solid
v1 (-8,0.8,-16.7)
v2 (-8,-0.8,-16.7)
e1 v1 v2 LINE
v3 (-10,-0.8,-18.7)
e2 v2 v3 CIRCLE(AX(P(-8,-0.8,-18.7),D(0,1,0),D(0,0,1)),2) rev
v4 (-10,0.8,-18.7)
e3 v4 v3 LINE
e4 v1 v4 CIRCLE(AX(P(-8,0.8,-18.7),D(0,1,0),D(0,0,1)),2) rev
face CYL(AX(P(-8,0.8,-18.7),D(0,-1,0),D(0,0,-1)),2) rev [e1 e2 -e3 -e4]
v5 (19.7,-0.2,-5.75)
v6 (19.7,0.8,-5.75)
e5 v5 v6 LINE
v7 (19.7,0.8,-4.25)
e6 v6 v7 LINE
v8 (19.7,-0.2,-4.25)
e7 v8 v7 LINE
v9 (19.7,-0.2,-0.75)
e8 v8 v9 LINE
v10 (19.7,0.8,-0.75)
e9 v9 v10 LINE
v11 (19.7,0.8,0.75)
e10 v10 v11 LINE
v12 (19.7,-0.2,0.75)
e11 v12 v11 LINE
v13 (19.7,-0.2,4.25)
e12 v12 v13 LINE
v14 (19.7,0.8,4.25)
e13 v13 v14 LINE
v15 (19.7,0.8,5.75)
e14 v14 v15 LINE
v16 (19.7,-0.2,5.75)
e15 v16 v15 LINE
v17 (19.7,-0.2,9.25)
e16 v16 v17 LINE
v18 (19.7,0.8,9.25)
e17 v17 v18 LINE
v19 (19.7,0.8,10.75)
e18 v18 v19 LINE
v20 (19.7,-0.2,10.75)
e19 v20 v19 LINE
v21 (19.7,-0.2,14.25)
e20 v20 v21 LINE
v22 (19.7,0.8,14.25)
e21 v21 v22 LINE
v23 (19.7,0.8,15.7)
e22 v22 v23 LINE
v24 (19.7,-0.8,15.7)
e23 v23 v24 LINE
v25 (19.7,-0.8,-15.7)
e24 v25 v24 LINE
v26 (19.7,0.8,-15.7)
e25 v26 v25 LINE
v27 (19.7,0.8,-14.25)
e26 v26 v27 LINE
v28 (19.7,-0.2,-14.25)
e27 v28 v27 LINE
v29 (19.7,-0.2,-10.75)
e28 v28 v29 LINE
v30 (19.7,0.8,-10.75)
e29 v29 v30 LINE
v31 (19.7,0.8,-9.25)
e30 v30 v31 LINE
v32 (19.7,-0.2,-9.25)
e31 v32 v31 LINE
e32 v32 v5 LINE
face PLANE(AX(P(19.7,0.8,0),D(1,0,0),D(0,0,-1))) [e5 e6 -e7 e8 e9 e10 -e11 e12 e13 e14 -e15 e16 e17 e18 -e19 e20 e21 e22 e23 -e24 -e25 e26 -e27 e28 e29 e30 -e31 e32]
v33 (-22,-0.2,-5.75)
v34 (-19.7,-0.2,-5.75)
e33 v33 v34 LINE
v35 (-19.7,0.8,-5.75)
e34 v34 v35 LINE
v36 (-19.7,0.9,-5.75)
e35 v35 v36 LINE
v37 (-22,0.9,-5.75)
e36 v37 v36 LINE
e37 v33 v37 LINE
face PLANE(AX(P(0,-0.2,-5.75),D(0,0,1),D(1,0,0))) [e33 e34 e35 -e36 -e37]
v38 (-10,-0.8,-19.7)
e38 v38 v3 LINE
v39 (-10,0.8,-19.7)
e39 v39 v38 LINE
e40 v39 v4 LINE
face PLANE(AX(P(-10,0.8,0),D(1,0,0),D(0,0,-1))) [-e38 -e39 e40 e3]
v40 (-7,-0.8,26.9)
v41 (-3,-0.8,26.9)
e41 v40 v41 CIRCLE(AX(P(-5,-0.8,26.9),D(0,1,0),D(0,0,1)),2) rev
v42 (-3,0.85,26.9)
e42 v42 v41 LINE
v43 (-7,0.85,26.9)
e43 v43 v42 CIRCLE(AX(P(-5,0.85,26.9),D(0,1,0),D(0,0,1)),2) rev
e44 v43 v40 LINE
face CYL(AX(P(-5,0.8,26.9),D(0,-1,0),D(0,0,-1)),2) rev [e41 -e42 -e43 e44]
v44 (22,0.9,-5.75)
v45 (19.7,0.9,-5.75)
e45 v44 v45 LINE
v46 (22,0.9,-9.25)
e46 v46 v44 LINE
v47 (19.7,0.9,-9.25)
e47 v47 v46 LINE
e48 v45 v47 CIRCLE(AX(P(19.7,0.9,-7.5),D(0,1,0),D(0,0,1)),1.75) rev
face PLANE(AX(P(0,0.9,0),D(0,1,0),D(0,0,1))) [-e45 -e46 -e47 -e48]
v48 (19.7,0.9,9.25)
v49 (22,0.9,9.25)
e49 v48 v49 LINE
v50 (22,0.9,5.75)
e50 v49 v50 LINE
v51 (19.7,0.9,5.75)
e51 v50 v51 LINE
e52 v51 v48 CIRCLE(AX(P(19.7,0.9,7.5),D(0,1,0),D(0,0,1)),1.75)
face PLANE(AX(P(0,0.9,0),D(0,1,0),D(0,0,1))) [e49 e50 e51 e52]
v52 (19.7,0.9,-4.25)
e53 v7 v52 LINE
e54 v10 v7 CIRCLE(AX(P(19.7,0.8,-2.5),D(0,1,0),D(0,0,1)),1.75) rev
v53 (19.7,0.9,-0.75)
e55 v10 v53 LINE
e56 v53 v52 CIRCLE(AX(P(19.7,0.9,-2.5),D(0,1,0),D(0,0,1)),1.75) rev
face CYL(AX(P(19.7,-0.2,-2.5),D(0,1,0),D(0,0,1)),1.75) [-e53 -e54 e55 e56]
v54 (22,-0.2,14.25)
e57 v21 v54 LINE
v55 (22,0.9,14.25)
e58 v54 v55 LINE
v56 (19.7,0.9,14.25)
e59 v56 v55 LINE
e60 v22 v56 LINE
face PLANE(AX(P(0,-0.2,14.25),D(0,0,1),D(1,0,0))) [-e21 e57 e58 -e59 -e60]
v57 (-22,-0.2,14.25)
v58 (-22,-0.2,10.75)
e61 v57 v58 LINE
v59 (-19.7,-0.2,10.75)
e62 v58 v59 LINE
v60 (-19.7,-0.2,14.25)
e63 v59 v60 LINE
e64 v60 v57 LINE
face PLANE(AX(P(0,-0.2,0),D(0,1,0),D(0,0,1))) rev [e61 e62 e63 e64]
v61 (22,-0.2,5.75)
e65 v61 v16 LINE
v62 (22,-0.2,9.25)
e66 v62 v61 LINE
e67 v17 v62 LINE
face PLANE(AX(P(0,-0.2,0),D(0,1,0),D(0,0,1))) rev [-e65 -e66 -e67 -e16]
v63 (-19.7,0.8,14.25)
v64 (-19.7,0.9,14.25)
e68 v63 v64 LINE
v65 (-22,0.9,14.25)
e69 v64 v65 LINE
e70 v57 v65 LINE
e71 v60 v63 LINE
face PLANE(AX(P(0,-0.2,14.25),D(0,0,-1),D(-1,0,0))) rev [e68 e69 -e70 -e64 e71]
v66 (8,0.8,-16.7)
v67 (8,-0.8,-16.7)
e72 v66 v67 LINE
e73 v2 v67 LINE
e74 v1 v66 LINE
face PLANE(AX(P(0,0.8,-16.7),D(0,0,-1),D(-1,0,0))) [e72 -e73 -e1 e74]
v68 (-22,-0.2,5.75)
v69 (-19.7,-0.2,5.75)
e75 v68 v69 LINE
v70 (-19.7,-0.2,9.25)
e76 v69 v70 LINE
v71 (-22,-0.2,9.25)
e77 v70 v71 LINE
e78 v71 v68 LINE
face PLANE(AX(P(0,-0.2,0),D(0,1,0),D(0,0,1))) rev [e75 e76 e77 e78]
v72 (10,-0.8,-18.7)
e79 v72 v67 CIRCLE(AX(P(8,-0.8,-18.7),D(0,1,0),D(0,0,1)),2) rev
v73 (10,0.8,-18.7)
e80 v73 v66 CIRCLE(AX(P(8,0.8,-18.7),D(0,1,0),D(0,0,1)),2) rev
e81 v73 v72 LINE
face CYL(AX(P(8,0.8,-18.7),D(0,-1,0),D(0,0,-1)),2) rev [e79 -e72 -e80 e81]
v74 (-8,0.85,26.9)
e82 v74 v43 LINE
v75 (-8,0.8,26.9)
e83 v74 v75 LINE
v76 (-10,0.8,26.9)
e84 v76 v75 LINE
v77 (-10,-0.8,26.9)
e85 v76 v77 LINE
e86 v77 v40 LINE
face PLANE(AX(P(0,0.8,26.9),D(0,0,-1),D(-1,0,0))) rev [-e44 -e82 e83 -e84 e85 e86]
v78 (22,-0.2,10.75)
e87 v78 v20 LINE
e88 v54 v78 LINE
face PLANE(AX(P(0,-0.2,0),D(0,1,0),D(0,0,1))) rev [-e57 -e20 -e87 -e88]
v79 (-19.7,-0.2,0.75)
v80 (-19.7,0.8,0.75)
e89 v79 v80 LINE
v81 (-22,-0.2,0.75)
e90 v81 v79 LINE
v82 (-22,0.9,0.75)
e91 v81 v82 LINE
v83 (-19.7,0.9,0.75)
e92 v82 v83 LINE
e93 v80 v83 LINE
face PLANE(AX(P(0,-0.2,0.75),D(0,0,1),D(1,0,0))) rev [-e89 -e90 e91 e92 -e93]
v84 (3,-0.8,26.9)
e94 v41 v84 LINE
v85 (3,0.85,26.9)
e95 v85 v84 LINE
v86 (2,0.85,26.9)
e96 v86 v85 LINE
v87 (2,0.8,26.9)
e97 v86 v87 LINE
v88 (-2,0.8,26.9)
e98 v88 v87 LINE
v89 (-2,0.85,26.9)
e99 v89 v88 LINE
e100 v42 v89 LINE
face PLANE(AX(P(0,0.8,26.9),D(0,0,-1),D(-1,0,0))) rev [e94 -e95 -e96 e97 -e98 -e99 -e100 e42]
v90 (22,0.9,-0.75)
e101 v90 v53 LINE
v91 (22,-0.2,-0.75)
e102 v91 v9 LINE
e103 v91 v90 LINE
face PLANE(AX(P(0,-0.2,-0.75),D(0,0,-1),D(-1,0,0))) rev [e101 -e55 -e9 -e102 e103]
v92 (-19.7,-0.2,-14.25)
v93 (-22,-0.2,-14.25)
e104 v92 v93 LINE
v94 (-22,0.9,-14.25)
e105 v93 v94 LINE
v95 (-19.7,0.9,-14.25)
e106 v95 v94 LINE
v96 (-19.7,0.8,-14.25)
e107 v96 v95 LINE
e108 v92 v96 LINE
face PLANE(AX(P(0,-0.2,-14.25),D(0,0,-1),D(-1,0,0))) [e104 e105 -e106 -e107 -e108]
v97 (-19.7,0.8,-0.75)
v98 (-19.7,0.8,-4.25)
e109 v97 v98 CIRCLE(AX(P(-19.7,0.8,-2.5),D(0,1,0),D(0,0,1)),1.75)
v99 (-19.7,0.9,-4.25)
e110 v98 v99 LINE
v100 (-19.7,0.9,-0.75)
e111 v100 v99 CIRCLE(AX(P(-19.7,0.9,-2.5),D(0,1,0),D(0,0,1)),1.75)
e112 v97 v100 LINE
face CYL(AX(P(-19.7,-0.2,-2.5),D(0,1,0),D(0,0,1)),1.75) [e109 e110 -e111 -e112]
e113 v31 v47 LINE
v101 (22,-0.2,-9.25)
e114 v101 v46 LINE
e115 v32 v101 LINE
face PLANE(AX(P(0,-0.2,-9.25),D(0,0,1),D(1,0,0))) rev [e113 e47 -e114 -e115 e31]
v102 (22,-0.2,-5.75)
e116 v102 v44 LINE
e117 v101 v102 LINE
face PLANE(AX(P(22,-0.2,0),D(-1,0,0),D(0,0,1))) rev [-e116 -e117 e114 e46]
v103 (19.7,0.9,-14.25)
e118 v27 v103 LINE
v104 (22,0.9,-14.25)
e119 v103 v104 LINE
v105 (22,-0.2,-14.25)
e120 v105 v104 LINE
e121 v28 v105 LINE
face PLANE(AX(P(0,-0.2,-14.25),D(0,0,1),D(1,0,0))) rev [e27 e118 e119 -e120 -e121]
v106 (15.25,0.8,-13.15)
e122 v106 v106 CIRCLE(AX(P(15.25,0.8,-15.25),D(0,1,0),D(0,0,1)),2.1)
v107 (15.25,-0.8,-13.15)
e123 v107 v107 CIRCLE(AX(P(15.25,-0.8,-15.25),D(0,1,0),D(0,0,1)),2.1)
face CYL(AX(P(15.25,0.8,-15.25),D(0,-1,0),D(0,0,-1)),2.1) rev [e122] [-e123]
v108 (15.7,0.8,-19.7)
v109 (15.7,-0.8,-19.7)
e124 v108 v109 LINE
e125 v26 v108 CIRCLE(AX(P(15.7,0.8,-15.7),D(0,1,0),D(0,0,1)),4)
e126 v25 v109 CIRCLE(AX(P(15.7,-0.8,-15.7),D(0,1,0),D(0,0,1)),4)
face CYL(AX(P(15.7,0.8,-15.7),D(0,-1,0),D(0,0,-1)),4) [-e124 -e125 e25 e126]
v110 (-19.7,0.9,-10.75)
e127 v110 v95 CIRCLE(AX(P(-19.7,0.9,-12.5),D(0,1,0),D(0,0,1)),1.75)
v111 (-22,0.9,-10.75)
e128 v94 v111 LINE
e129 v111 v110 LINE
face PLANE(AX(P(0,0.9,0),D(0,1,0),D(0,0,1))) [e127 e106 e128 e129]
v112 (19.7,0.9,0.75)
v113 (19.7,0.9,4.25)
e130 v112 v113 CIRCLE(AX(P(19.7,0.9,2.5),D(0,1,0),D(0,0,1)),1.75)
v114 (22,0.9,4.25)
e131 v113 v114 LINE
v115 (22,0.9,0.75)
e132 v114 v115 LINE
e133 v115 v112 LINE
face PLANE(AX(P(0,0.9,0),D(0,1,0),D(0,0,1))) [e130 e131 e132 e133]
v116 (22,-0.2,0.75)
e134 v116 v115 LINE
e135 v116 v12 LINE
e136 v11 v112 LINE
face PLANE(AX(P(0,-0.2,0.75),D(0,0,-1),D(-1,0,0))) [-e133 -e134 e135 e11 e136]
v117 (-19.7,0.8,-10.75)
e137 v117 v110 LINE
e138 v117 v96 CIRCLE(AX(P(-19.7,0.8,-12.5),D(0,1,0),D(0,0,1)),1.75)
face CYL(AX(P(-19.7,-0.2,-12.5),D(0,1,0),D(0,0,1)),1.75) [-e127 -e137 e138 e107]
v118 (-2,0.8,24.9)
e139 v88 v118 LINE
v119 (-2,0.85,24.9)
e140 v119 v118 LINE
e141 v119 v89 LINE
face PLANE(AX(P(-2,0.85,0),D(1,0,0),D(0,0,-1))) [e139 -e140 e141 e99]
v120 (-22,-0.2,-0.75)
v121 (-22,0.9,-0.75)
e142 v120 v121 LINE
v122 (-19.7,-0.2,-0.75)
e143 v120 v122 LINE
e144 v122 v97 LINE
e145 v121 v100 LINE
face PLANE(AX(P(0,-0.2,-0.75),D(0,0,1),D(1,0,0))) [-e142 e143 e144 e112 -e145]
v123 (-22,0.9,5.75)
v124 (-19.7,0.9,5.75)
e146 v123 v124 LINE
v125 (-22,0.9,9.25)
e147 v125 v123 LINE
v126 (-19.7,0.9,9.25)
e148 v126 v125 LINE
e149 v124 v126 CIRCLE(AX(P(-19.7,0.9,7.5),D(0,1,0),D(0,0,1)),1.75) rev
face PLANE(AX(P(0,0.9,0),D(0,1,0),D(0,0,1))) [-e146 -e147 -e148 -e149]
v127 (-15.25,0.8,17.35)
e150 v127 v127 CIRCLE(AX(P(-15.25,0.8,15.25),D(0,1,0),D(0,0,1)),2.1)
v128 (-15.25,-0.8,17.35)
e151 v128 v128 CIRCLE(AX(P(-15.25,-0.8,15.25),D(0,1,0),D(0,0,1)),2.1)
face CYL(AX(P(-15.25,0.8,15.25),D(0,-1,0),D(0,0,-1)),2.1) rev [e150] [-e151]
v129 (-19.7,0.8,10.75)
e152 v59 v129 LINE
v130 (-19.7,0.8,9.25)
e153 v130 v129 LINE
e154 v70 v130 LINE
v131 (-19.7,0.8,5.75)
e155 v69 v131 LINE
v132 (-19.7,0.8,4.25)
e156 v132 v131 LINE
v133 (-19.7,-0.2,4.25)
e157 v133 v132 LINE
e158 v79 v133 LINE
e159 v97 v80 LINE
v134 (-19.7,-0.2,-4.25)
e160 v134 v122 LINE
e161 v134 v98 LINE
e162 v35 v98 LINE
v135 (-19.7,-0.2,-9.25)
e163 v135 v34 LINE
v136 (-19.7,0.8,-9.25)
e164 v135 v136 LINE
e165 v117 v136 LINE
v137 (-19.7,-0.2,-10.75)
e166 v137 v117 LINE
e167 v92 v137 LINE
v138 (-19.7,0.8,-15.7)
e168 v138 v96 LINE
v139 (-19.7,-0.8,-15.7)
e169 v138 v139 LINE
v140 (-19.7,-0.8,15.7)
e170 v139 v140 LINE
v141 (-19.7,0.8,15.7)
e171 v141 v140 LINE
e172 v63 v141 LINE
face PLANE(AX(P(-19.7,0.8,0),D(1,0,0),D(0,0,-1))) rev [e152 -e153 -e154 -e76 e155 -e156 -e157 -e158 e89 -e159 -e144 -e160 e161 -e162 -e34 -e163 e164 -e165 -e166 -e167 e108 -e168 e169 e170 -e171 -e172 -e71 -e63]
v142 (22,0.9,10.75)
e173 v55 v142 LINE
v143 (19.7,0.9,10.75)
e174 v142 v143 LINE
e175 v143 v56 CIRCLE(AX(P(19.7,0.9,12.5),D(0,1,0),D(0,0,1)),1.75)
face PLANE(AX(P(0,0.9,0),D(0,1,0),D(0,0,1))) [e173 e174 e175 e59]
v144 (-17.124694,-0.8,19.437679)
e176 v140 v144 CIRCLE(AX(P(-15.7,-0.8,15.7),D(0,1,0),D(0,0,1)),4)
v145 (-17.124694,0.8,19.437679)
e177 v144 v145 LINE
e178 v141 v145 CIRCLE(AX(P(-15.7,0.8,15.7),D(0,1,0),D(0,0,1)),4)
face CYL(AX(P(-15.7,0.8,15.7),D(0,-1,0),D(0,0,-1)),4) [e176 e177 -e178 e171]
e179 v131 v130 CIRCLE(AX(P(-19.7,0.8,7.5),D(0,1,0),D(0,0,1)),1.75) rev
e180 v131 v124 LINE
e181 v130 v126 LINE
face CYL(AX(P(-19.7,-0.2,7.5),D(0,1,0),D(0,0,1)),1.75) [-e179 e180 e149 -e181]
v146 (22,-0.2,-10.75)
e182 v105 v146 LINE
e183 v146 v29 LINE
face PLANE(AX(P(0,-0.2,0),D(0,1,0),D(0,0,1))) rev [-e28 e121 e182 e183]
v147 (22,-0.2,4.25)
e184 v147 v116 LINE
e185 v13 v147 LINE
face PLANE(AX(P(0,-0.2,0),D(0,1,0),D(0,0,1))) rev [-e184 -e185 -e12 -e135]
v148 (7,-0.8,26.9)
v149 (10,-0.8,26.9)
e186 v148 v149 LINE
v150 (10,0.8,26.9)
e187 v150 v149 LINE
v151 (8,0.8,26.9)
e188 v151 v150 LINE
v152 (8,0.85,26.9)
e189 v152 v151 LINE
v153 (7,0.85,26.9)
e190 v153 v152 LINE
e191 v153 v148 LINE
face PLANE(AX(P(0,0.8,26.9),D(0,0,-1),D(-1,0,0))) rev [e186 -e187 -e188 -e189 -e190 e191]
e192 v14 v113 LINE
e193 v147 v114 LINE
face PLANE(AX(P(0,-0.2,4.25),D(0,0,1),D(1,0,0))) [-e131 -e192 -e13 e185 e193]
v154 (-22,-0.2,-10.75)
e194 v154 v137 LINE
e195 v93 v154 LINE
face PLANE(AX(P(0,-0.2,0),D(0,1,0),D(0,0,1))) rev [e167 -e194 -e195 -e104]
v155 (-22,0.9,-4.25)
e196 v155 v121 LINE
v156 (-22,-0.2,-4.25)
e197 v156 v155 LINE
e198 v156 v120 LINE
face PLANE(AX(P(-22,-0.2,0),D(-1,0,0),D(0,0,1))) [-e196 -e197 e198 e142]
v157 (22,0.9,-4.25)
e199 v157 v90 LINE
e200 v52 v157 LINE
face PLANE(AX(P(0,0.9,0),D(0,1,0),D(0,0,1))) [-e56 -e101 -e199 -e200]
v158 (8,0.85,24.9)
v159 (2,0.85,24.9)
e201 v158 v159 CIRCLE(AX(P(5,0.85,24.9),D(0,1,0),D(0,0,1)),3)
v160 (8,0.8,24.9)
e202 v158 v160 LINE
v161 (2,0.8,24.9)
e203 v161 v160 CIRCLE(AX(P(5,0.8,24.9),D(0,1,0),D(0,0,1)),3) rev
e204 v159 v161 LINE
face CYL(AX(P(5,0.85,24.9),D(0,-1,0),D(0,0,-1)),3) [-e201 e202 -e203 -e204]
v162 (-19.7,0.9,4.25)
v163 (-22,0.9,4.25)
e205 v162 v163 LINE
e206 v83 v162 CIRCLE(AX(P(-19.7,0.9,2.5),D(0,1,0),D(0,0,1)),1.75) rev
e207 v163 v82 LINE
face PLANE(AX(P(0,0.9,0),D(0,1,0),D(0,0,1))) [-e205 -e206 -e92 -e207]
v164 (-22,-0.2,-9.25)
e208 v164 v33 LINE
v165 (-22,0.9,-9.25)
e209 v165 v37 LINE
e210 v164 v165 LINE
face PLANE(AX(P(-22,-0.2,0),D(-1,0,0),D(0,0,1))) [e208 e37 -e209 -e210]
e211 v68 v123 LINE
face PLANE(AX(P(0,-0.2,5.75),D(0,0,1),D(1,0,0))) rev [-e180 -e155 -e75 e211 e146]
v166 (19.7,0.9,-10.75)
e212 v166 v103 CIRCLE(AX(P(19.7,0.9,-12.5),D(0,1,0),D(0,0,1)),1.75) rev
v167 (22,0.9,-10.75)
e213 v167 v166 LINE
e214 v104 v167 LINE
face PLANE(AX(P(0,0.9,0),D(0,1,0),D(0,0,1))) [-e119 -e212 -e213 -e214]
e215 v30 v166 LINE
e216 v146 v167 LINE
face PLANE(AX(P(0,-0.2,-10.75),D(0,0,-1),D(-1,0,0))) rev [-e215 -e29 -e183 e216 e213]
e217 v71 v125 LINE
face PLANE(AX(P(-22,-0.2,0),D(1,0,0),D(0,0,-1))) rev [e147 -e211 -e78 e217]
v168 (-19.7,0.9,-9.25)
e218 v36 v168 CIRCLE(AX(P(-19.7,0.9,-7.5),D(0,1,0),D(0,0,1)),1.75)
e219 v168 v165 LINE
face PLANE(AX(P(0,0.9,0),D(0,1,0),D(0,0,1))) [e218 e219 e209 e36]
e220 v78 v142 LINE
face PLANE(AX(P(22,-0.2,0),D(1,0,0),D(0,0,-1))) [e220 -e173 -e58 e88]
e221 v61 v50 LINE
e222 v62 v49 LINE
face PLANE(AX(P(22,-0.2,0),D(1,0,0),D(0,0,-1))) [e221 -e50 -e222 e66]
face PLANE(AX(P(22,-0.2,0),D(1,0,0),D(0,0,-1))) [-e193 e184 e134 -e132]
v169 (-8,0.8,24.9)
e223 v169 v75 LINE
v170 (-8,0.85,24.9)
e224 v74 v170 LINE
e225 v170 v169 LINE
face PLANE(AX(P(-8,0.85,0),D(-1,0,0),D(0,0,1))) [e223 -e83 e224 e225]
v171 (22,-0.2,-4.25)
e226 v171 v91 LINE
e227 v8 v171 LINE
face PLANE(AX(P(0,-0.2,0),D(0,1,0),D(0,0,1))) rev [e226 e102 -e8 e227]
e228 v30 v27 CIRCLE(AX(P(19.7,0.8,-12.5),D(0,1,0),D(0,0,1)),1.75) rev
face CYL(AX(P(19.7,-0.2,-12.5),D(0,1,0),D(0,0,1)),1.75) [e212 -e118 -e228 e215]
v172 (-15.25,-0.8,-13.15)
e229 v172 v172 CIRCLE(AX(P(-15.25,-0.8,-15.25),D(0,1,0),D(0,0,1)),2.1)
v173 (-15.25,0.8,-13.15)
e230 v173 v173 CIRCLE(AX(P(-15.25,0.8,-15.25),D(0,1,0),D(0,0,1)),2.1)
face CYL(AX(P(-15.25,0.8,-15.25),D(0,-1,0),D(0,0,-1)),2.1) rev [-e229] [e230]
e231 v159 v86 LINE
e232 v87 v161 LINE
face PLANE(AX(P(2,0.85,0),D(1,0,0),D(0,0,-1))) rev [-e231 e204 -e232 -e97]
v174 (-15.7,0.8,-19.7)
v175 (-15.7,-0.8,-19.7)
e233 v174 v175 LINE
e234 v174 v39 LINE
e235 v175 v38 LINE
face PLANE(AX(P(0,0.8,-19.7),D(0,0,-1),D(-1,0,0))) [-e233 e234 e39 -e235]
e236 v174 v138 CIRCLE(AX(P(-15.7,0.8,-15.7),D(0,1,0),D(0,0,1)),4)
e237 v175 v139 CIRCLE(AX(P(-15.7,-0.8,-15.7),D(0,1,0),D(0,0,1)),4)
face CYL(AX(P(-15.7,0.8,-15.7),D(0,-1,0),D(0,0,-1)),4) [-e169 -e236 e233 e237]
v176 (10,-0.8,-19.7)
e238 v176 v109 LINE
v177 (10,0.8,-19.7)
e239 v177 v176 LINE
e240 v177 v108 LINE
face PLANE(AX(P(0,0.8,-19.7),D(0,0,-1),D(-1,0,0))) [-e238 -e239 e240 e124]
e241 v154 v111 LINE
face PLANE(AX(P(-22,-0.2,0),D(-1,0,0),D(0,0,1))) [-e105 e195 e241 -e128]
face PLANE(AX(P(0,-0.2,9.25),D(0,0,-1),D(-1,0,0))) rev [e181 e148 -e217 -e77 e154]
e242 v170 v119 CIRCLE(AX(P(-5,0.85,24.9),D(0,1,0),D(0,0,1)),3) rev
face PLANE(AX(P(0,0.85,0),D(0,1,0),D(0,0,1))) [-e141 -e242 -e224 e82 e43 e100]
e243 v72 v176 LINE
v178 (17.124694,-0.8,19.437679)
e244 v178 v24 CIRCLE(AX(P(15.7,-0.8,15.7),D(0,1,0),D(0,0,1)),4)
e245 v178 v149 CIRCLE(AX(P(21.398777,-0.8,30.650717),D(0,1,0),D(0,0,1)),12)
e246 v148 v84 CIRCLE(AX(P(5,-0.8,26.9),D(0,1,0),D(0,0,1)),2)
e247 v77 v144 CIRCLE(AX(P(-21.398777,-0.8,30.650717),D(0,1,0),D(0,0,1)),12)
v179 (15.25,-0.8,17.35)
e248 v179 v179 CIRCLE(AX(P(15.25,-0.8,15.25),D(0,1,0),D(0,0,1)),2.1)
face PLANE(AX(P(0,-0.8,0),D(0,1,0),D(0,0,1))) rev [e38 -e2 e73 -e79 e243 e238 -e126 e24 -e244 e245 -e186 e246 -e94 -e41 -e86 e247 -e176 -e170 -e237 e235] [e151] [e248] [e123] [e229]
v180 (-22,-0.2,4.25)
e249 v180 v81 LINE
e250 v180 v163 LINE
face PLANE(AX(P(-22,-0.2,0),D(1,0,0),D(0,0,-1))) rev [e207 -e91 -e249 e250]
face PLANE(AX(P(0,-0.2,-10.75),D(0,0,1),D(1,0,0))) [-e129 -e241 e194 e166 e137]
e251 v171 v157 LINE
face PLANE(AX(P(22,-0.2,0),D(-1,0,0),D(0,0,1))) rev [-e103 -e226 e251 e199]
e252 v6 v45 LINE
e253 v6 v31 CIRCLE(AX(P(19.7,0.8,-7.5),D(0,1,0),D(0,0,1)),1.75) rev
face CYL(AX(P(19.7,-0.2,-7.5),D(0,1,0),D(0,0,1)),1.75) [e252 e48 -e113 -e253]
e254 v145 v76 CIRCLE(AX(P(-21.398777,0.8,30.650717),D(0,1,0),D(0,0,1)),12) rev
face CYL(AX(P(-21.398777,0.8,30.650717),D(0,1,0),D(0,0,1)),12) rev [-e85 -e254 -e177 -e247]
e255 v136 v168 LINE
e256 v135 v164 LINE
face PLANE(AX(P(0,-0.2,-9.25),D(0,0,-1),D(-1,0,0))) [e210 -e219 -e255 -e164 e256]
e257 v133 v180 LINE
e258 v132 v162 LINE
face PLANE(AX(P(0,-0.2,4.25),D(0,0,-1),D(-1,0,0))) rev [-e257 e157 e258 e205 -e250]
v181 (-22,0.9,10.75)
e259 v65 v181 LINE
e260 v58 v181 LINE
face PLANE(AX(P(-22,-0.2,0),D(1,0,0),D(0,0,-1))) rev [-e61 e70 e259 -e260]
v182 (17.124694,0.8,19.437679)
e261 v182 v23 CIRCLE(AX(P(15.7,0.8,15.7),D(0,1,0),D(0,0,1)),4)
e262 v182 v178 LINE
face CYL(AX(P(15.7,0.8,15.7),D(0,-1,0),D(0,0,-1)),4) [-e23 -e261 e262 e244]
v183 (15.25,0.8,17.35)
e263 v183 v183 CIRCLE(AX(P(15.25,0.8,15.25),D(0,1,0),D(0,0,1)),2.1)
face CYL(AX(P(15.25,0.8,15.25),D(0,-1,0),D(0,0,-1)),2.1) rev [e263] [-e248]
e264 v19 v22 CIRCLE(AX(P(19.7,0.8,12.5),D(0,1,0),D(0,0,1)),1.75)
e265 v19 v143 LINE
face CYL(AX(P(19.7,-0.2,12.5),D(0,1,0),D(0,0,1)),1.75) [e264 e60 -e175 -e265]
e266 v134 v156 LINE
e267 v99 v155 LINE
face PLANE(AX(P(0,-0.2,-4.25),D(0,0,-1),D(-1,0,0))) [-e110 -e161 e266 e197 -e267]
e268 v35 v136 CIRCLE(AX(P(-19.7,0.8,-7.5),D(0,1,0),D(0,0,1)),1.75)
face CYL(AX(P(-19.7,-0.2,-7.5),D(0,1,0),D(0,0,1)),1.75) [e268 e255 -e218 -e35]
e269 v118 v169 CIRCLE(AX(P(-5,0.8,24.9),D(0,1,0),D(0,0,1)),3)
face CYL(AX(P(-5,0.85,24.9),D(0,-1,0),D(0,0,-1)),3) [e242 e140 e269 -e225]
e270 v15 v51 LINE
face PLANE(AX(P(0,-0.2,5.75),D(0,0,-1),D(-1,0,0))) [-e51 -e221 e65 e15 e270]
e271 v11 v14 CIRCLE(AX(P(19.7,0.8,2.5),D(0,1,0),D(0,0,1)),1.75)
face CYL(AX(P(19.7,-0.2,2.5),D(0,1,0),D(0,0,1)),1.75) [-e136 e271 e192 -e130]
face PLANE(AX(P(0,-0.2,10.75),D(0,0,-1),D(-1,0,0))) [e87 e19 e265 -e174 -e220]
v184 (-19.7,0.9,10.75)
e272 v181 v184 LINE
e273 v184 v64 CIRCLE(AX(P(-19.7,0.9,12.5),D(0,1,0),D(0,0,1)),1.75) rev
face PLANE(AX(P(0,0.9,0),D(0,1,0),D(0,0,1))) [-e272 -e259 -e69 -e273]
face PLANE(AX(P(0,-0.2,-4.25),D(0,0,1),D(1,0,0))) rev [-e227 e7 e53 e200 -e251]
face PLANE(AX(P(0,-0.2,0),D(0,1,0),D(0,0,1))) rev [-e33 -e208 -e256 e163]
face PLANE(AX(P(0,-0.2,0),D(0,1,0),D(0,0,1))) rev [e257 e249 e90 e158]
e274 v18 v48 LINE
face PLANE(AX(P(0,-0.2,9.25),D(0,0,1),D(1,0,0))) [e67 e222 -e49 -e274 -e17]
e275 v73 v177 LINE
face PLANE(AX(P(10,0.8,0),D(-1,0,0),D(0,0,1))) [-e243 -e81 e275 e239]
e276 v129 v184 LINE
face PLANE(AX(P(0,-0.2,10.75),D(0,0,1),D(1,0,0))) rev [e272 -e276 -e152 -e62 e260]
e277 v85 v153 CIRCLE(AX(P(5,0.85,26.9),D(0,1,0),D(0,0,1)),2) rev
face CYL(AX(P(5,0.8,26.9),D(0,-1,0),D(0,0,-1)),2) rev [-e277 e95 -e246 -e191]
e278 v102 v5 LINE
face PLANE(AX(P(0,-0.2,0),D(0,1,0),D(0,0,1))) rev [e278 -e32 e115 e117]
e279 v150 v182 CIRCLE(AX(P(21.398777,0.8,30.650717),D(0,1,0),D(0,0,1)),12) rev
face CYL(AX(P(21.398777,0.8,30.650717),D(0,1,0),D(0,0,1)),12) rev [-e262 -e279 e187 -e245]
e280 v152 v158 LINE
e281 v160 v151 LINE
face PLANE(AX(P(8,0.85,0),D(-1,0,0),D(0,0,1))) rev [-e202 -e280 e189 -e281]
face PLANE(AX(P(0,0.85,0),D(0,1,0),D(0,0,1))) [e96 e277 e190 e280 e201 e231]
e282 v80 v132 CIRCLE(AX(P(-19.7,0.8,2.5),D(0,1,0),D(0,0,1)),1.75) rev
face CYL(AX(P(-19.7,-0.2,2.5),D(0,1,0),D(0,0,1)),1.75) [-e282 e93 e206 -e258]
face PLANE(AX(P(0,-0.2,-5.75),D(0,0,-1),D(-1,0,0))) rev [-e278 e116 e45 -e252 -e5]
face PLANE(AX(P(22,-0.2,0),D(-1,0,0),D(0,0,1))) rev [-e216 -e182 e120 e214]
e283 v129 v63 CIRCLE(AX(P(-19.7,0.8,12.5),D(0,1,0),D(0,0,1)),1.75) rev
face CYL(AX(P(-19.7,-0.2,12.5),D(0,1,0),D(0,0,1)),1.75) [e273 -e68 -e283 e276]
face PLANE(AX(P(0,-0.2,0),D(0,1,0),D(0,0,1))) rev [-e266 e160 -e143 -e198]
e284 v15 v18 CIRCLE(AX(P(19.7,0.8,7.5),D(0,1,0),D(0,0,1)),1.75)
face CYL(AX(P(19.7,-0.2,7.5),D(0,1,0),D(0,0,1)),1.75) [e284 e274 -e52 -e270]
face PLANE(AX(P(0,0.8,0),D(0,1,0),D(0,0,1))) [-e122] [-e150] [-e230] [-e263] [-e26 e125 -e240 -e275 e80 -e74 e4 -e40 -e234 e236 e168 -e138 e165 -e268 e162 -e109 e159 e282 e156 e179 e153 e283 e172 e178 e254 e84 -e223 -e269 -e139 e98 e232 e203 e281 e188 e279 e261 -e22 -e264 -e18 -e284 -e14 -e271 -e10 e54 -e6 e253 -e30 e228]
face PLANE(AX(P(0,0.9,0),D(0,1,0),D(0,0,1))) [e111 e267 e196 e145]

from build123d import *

# Parameters (mm, degrees)
SKETCH1_R                = 2.1
BOSS_EXTRUDE1_DEPTH      = 0.8
FILLET1_R                = 12
BOSS_EXTRUDE3_DEPTH      = 0.05
BOSS_EXTRUDE4_DEPTH      = 0.1
BOSS_EXTRUDE4_DEPTH_BACK = 1


with BuildPart() as part:
    # Sketch1 → Boss-Extrude1 (new, symmetric)
    with BuildSketch(Plane(origin=(0, 0, 0), x_dir=(1, 0, 0), z_dir=(0, 1, 0))):
        with BuildLine():
            Line((-10, 18.7), (-10, 19.7))
            Line((-10, 19.7), (-15.7, 19.7))
            ThreePointArc((-15.7, 19.7), (-18.528427125, 18.528427125), (-19.7, 15.7))
            Line((-19.7, 15.7), (-19.7, -15.7))
            ThreePointArc((-19.7, -15.7), (-18.528427125, -18.528427125), (-15.7, -19.7))
            Line((-15.7, -19.7), (-10, -19.7))
            Line((-10, -19.7), (-10, -26.9))
            Line((-10, -26.9), (-7, -26.9))
            ThreePointArc((-7, -26.9), (-5, -24.9), (-3, -26.9))
            Line((-3, -26.9), (3, -26.9))
            ThreePointArc((3, -26.9), (5, -24.9), (7, -26.9))
            Line((7, -26.9), (10, -26.9))
            Line((10, -26.9), (10, -19.7))
            Line((10, -19.7), (15.7, -19.7))
            ThreePointArc((15.7, -19.7), (18.528427125, -18.528427125), (19.7, -15.7))
            Line((19.7, -15.7), (19.7, 15.7))
            ThreePointArc((19.7, 15.7), (18.528427125, 18.528427125), (15.7, 19.7))
            Line((15.7, 19.7), (10, 19.7))
            Line((10, 19.7), (10, 18.7))
            ThreePointArc((10, 18.7), (9.414213562, 17.285786438), (8, 16.7))
            Line((8, 16.7), (-8, 16.7))
            ThreePointArc((-8, 16.7), (-9.414213562, 17.285786438), (-10, 18.7))
        make_face()
        with Locations(Location((-15.25, -15.25, 0), (0, 0, 270))):
            Circle(SKETCH1_R, mode=Mode.SUBTRACT)
        with Locations(Location((15.25, -15.25, 0), (0, 0, 270))):
            Circle(SKETCH1_R, mode=Mode.SUBTRACT)
        with Locations(Location((-15.25, 15.25, 0), (0, 0, 270))):
            Circle(SKETCH1_R, mode=Mode.SUBTRACT)
        with Locations(Location((15.25, 15.25, 0), (0, 0, 270))):
            Circle(SKETCH1_R, mode=Mode.SUBTRACT)
    extrude(amount=BOSS_EXTRUDE1_DEPTH, both=True)

    # Fillet1
    # the kernel refuses this fillet: 12 mm, written as the material it adds along each edge
    with BuildSketch(Plane(origin=(-10, -0.8, 19.7), x_dir=(0, 0, 1), z_dir=(0, 1, 0))) as fillet1_piece_1:
        with BuildLine():
            CenterArc((10.950716979, -11.398777221), FILLET1_R, 108.21356071, 50.921051977)
            Line((-0.262320755, -7.124694305), (-1.383624529, -6.697286014))
            ThreePointArc((-1.383624529, -6.697286014), (-1.2, -5.7), (-1.2, 0))
            Line((-1.2, 0), (0, 1.2))
            ThreePointArc((0, 1.2), (3.6, 1.2), (6.824928302, 1.139877722))
            Line((6.824928302, 1.139877722), (7.2, 0))
        make_face()
    extrude(amount=1.6)
    with BuildSketch(Plane(origin=(10, -0.8, 19.7), x_dir=(0.9993228863513164, 0, -0.03679359746578182), z_dir=(0, 1, 0))) as fillet1_piece_2:
        with BuildLine():
            CenterArc((10.988142681, -11.36270412), FILLET1_R, 108.756793525, 50.921051977)
            Line((-0.264913902, -7.195124782), (-1.39021956, -6.778366848))
            ThreePointArc((-1.39021956, -6.778366848), (-1.331644414, -3.553410074), (-1.199187464, 0.044152317))
            Line((-1.199187464, 0.044152317), (0.044152317, 1.199187464))
            ThreePointArc((0.044152317, 1.199187464), (5.740292769, 0.989463958), (6.743659714, 1.136270412))
            Line((6.743659714, 1.136270412), (7.129521802, 0))
        make_face()
    extrude(amount=1.6)

    # Sketch4 → Boss-Extrude3 (add, symmetric)
    with BuildSketch(Plane(origin=(0, 0.8, 0), x_dir=(1, 0, 0), z_dir=(0, 1, 0))):
        with BuildLine():
            Line((-8, -24.9), (-8, -26.9))
            Line((-8, -26.9), (-7, -26.9))
            ThreePointArc((-7, -26.9), (-5, -24.9), (-3, -26.9))
            Line((-3, -26.9), (-2, -26.9))
            Line((-2, -26.9), (-2, -24.9))
            ThreePointArc((-2, -24.9), (-5, -21.9), (-8, -24.9))
        make_face()
        with BuildLine():
            Line((2, -24.9), (2, -26.9))
            Line((2, -26.9), (3, -26.9))
            ThreePointArc((3, -26.9), (5, -24.9), (7, -26.9))
            Line((7, -26.9), (8, -26.9))
            Line((8, -26.9), (8, -24.9))
            ThreePointArc((8, -24.9), (5, -21.9), (2, -24.9))
        make_face()
    extrude(amount=BOSS_EXTRUDE3_DEPTH, both=True)

    # Sketch5 → Boss-Extrude4 (add, two sides: drawn at the far end of the back side and taken through both)
    with BuildSketch(Plane(origin=(0, 0.8, 0), x_dir=(1, 0, 0), z_dir=(0, 1, 0)).offset(-BOSS_EXTRUDE4_DEPTH_BACK)):
        with BuildLine():
            ThreePointArc((-17.95, -12.5), (-18.462563133, -11.262563133), (-19.7, -10.75))
            Line((-19.7, -10.75), (-19.7, -14.25))
            ThreePointArc((-19.7, -14.25), (-18.462563133, -13.737436867), (-17.95, -12.5))
        make_face()
        with BuildLine():
            Line((-19.7, -14.25), (-19.7, -10.75))
            ThreePointArc((-19.7, -10.75), (-21.45, -12.5), (-19.7, -14.25))
        make_face()
        with BuildLine():
            ThreePointArc((-19.7, -14.25), (-21.45, -12.5), (-19.7, -10.75))
            Line((-19.7, -10.75), (-22, -10.75))
            Line((-22, -10.75), (-22, -14.25))
            Line((-22, -14.25), (-19.7, -14.25))
        make_face()
        with BuildLine():
            ThreePointArc((-17.95, -7.5), (-18.462563133, -6.262563133), (-19.7, -5.75))
            Line((-19.7, -5.75), (-19.7, -9.25))
            ThreePointArc((-19.7, -9.25), (-18.462563133, -8.737436867), (-17.95, -7.5))
        make_face()
        with BuildLine():
            Line((-19.7, -9.25), (-19.7, -5.75))
            ThreePointArc((-19.7, -5.75), (-21.45, -7.5), (-19.7, -9.25))
        make_face()
        with BuildLine():
            ThreePointArc((-19.7, -9.25), (-21.45, -7.5), (-19.7, -5.75))
            Line((-19.7, -5.75), (-22, -5.75))
            Line((-22, -5.75), (-22, -9.25))
            Line((-22, -9.25), (-19.7, -9.25))
        make_face()
        with BuildLine():
            ThreePointArc((-17.95, -2.5), (-18.462563133, -1.262563133), (-19.7, -0.75))
            Line((-19.7, -0.75), (-19.7, -4.25))
            ThreePointArc((-19.7, -4.25), (-18.462563133, -3.737436867), (-17.95, -2.5))
        make_face()
        with BuildLine():
            Line((-19.7, -4.25), (-19.7, -0.75))
            ThreePointArc((-19.7, -0.75), (-21.45, -2.5), (-19.7, -4.25))
        make_face()
        with BuildLine():
            ThreePointArc((-19.7, -4.25), (-21.45, -2.5), (-19.7, -0.75))
            Line((-19.7, -0.75), (-22, -0.75))
            Line((-22, -0.75), (-22, -4.25))
            Line((-22, -4.25), (-19.7, -4.25))
        make_face()
        with BuildLine():
            Line((-19.7, 0.75), (-19.7, 4.25))
            ThreePointArc((-19.7, 4.25), (-21.45, 2.5), (-19.7, 0.75))
        make_face()
        with BuildLine():
            ThreePointArc((-17.95, 2.5), (-18.462563133, 3.737436867), (-19.7, 4.25))
            Line((-19.7, 4.25), (-19.7, 0.75))
            ThreePointArc((-19.7, 0.75), (-18.462563133, 1.262563133), (-17.95, 2.5))
        make_face()
        with BuildLine():
            ThreePointArc((-19.7, 0.75), (-21.45, 2.5), (-19.7, 4.25))
            Line((-19.7, 4.25), (-22, 4.25))
            Line((-22, 4.25), (-22, 0.75))
            Line((-22, 0.75), (-19.7, 0.75))
        make_face()
        with BuildLine():
            ThreePointArc((-19.7, 9.25), (-21.45, 7.5), (-19.7, 5.75))
            Line((-19.7, 5.75), (-19.7, 9.25))
        make_face()
        with BuildLine():
            Line((-19.7, 9.25), (-19.7, 5.75))
            ThreePointArc((-19.7, 5.75), (-18.462563133, 6.262563133), (-17.95, 7.5))
            ThreePointArc((-17.95, 7.5), (-18.462563133, 8.737436867), (-19.7, 9.25))
        make_face()
        with BuildLine():
            Line((-22, 5.75), (-19.7, 5.75))
            ThreePointArc((-19.7, 5.75), (-21.45, 7.5), (-19.7, 9.25))
            Line((-19.7, 9.25), (-22, 9.25))
            Line((-22, 9.25), (-22, 5.75))
        make_face()
        with BuildLine():
            ThreePointArc((-19.7, 14.25), (-21.45, 12.5), (-19.7, 10.75))
            Line((-19.7, 10.75), (-19.7, 14.25))
        make_face()
        with BuildLine():
            Line((-19.7, 14.25), (-19.7, 10.75))
            ThreePointArc((-19.7, 10.75), (-18.462563133, 11.262563133), (-17.95, 12.5))
            ThreePointArc((-17.95, 12.5), (-18.462563133, 13.737436867), (-19.7, 14.25))
        make_face()
        with BuildLine():
            Line((-22, 10.75), (-19.7, 10.75))
            ThreePointArc((-19.7, 10.75), (-21.45, 12.5), (-19.7, 14.25))
            Line((-19.7, 14.25), (-22, 14.25))
            Line((-22, 14.25), (-22, 10.75))
        make_face()
        with BuildLine():
            ThreePointArc((21.45, -12.5), (20.937436867, -11.262563133), (19.7, -10.75))
            Line((19.7, -10.75), (19.7, -14.25))
            ThreePointArc((19.7, -14.25), (20.937436867, -13.737436867), (21.45, -12.5))
        make_face()
        with BuildLine():
            Line((19.7, -14.25), (19.7, -10.75))
            ThreePointArc((19.7, -10.75), (17.95, -12.5), (19.7, -14.25))
        make_face()
        with BuildLine():
            Line((22, -10.75), (19.7, -10.75))
            ThreePointArc((19.7, -10.75), (20.937436867, -11.262563133), (21.45, -12.5))
            ThreePointArc((21.45, -12.5), (20.937436867, -13.737436867), (19.7, -14.25))
            Line((19.7, -14.25), (22, -14.25))
            Line((22, -14.25), (22, -10.75))
        make_face()
        with BuildLine():
            Line((22, -5.75), (19.7, -5.75))
            ThreePointArc((19.7, -5.75), (20.937436867, -6.262563133), (21.45, -7.5))
            ThreePointArc((21.45, -7.5), (20.937436867, -8.737436867), (19.7, -9.25))
            Line((19.7, -9.25), (22, -9.25))
            Line((22, -9.25), (22, -5.75))
        make_face()
        with BuildLine():
            ThreePointArc((21.45, -7.5), (20.937436867, -6.262563133), (19.7, -5.75))
            Line((19.7, -5.75), (19.7, -9.25))
            ThreePointArc((19.7, -9.25), (20.937436867, -8.737436867), (21.45, -7.5))
        make_face()
        with BuildLine():
            Line((19.7, -9.25), (19.7, -5.75))
            ThreePointArc((19.7, -5.75), (17.95, -7.5), (19.7, -9.25))
        make_face()
        with BuildLine():
            Line((19.7, -0.75), (19.7, -4.25))
            ThreePointArc((19.7, -4.25), (20.937436867, -3.737436867), (21.45, -2.5))
            ThreePointArc((21.45, -2.5), (20.937436867, -1.262563133), (19.7, -0.75))
        make_face()
        with BuildLine():
            ThreePointArc((19.7, -0.75), (17.95, -2.5), (19.7, -4.25))
            Line((19.7, -4.25), (19.7, -0.75))
        make_face()
        with BuildLine():
            ThreePointArc((21.45, -2.5), (20.937436867, -3.737436867), (19.7, -4.25))
            Line((19.7, -4.25), (22, -4.25))
            Line((22, -4.25), (22, -0.75))
            Line((22, -0.75), (19.7, -0.75))
            ThreePointArc((19.7, -0.75), (20.937436867, -1.262563133), (21.45, -2.5))
        make_face()
        with BuildLine():
            ThreePointArc((19.7, 4.25), (17.95, 2.5), (19.7, 0.75))
            Line((19.7, 0.75), (19.7, 4.25))
        make_face()
        with BuildLine():
            Line((19.7, 4.25), (19.7, 0.75))
            ThreePointArc((19.7, 0.75), (20.937436867, 1.262563133), (21.45, 2.5))
            ThreePointArc((21.45, 2.5), (20.937436867, 3.737436867), (19.7, 4.25))
        make_face()
        with BuildLine():
            ThreePointArc((21.45, 2.5), (20.937436867, 1.262563133), (19.7, 0.75))
            Line((19.7, 0.75), (22, 0.75))
            Line((22, 0.75), (22, 4.25))
            Line((22, 4.25), (19.7, 4.25))
            ThreePointArc((19.7, 4.25), (20.937436867, 3.737436867), (21.45, 2.5))
        make_face()
        with BuildLine():
            ThreePointArc((19.7, 9.25), (17.95, 7.5), (19.7, 5.75))
            Line((19.7, 5.75), (19.7, 9.25))
        make_face()
        with BuildLine():
            Line((19.7, 9.25), (19.7, 5.75))
            ThreePointArc((19.7, 5.75), (20.937436867, 6.262563133), (21.45, 7.5))
            ThreePointArc((21.45, 7.5), (20.937436867, 8.737436867), (19.7, 9.25))
        make_face()
        with BuildLine():
            ThreePointArc((21.45, 7.5), (20.937436867, 6.262563133), (19.7, 5.75))
            Line((19.7, 5.75), (22, 5.75))
            Line((22, 5.75), (22, 9.25))
            Line((22, 9.25), (19.7, 9.25))
            ThreePointArc((19.7, 9.25), (20.937436867, 8.737436867), (21.45, 7.5))
        make_face()
        with BuildLine():
            ThreePointArc((19.7, 14.25), (17.95, 12.5), (19.7, 10.75))
            Line((19.7, 10.75), (19.7, 14.25))
        make_face()
        with BuildLine():
            Line((19.7, 14.25), (19.7, 10.75))
            ThreePointArc((19.7, 10.75), (20.937436867, 11.262563133), (21.45, 12.5))
            ThreePointArc((21.45, 12.5), (20.937436867, 13.737436867), (19.7, 14.25))
        make_face()
        with BuildLine():
            ThreePointArc((21.45, 12.5), (20.937436867, 11.262563133), (19.7, 10.75))
            Line((19.7, 10.75), (22, 10.75))
            Line((22, 10.75), (22, 14.25))
            Line((22, 14.25), (19.7, 14.25))
            ThreePointArc((19.7, 14.25), (20.937436867, 13.737436867), (21.45, 12.5))
        make_face()
    extrude(amount=BOSS_EXTRUDE4_DEPTH + BOSS_EXTRUDE4_DEPTH_BACK)


solid = part.part
